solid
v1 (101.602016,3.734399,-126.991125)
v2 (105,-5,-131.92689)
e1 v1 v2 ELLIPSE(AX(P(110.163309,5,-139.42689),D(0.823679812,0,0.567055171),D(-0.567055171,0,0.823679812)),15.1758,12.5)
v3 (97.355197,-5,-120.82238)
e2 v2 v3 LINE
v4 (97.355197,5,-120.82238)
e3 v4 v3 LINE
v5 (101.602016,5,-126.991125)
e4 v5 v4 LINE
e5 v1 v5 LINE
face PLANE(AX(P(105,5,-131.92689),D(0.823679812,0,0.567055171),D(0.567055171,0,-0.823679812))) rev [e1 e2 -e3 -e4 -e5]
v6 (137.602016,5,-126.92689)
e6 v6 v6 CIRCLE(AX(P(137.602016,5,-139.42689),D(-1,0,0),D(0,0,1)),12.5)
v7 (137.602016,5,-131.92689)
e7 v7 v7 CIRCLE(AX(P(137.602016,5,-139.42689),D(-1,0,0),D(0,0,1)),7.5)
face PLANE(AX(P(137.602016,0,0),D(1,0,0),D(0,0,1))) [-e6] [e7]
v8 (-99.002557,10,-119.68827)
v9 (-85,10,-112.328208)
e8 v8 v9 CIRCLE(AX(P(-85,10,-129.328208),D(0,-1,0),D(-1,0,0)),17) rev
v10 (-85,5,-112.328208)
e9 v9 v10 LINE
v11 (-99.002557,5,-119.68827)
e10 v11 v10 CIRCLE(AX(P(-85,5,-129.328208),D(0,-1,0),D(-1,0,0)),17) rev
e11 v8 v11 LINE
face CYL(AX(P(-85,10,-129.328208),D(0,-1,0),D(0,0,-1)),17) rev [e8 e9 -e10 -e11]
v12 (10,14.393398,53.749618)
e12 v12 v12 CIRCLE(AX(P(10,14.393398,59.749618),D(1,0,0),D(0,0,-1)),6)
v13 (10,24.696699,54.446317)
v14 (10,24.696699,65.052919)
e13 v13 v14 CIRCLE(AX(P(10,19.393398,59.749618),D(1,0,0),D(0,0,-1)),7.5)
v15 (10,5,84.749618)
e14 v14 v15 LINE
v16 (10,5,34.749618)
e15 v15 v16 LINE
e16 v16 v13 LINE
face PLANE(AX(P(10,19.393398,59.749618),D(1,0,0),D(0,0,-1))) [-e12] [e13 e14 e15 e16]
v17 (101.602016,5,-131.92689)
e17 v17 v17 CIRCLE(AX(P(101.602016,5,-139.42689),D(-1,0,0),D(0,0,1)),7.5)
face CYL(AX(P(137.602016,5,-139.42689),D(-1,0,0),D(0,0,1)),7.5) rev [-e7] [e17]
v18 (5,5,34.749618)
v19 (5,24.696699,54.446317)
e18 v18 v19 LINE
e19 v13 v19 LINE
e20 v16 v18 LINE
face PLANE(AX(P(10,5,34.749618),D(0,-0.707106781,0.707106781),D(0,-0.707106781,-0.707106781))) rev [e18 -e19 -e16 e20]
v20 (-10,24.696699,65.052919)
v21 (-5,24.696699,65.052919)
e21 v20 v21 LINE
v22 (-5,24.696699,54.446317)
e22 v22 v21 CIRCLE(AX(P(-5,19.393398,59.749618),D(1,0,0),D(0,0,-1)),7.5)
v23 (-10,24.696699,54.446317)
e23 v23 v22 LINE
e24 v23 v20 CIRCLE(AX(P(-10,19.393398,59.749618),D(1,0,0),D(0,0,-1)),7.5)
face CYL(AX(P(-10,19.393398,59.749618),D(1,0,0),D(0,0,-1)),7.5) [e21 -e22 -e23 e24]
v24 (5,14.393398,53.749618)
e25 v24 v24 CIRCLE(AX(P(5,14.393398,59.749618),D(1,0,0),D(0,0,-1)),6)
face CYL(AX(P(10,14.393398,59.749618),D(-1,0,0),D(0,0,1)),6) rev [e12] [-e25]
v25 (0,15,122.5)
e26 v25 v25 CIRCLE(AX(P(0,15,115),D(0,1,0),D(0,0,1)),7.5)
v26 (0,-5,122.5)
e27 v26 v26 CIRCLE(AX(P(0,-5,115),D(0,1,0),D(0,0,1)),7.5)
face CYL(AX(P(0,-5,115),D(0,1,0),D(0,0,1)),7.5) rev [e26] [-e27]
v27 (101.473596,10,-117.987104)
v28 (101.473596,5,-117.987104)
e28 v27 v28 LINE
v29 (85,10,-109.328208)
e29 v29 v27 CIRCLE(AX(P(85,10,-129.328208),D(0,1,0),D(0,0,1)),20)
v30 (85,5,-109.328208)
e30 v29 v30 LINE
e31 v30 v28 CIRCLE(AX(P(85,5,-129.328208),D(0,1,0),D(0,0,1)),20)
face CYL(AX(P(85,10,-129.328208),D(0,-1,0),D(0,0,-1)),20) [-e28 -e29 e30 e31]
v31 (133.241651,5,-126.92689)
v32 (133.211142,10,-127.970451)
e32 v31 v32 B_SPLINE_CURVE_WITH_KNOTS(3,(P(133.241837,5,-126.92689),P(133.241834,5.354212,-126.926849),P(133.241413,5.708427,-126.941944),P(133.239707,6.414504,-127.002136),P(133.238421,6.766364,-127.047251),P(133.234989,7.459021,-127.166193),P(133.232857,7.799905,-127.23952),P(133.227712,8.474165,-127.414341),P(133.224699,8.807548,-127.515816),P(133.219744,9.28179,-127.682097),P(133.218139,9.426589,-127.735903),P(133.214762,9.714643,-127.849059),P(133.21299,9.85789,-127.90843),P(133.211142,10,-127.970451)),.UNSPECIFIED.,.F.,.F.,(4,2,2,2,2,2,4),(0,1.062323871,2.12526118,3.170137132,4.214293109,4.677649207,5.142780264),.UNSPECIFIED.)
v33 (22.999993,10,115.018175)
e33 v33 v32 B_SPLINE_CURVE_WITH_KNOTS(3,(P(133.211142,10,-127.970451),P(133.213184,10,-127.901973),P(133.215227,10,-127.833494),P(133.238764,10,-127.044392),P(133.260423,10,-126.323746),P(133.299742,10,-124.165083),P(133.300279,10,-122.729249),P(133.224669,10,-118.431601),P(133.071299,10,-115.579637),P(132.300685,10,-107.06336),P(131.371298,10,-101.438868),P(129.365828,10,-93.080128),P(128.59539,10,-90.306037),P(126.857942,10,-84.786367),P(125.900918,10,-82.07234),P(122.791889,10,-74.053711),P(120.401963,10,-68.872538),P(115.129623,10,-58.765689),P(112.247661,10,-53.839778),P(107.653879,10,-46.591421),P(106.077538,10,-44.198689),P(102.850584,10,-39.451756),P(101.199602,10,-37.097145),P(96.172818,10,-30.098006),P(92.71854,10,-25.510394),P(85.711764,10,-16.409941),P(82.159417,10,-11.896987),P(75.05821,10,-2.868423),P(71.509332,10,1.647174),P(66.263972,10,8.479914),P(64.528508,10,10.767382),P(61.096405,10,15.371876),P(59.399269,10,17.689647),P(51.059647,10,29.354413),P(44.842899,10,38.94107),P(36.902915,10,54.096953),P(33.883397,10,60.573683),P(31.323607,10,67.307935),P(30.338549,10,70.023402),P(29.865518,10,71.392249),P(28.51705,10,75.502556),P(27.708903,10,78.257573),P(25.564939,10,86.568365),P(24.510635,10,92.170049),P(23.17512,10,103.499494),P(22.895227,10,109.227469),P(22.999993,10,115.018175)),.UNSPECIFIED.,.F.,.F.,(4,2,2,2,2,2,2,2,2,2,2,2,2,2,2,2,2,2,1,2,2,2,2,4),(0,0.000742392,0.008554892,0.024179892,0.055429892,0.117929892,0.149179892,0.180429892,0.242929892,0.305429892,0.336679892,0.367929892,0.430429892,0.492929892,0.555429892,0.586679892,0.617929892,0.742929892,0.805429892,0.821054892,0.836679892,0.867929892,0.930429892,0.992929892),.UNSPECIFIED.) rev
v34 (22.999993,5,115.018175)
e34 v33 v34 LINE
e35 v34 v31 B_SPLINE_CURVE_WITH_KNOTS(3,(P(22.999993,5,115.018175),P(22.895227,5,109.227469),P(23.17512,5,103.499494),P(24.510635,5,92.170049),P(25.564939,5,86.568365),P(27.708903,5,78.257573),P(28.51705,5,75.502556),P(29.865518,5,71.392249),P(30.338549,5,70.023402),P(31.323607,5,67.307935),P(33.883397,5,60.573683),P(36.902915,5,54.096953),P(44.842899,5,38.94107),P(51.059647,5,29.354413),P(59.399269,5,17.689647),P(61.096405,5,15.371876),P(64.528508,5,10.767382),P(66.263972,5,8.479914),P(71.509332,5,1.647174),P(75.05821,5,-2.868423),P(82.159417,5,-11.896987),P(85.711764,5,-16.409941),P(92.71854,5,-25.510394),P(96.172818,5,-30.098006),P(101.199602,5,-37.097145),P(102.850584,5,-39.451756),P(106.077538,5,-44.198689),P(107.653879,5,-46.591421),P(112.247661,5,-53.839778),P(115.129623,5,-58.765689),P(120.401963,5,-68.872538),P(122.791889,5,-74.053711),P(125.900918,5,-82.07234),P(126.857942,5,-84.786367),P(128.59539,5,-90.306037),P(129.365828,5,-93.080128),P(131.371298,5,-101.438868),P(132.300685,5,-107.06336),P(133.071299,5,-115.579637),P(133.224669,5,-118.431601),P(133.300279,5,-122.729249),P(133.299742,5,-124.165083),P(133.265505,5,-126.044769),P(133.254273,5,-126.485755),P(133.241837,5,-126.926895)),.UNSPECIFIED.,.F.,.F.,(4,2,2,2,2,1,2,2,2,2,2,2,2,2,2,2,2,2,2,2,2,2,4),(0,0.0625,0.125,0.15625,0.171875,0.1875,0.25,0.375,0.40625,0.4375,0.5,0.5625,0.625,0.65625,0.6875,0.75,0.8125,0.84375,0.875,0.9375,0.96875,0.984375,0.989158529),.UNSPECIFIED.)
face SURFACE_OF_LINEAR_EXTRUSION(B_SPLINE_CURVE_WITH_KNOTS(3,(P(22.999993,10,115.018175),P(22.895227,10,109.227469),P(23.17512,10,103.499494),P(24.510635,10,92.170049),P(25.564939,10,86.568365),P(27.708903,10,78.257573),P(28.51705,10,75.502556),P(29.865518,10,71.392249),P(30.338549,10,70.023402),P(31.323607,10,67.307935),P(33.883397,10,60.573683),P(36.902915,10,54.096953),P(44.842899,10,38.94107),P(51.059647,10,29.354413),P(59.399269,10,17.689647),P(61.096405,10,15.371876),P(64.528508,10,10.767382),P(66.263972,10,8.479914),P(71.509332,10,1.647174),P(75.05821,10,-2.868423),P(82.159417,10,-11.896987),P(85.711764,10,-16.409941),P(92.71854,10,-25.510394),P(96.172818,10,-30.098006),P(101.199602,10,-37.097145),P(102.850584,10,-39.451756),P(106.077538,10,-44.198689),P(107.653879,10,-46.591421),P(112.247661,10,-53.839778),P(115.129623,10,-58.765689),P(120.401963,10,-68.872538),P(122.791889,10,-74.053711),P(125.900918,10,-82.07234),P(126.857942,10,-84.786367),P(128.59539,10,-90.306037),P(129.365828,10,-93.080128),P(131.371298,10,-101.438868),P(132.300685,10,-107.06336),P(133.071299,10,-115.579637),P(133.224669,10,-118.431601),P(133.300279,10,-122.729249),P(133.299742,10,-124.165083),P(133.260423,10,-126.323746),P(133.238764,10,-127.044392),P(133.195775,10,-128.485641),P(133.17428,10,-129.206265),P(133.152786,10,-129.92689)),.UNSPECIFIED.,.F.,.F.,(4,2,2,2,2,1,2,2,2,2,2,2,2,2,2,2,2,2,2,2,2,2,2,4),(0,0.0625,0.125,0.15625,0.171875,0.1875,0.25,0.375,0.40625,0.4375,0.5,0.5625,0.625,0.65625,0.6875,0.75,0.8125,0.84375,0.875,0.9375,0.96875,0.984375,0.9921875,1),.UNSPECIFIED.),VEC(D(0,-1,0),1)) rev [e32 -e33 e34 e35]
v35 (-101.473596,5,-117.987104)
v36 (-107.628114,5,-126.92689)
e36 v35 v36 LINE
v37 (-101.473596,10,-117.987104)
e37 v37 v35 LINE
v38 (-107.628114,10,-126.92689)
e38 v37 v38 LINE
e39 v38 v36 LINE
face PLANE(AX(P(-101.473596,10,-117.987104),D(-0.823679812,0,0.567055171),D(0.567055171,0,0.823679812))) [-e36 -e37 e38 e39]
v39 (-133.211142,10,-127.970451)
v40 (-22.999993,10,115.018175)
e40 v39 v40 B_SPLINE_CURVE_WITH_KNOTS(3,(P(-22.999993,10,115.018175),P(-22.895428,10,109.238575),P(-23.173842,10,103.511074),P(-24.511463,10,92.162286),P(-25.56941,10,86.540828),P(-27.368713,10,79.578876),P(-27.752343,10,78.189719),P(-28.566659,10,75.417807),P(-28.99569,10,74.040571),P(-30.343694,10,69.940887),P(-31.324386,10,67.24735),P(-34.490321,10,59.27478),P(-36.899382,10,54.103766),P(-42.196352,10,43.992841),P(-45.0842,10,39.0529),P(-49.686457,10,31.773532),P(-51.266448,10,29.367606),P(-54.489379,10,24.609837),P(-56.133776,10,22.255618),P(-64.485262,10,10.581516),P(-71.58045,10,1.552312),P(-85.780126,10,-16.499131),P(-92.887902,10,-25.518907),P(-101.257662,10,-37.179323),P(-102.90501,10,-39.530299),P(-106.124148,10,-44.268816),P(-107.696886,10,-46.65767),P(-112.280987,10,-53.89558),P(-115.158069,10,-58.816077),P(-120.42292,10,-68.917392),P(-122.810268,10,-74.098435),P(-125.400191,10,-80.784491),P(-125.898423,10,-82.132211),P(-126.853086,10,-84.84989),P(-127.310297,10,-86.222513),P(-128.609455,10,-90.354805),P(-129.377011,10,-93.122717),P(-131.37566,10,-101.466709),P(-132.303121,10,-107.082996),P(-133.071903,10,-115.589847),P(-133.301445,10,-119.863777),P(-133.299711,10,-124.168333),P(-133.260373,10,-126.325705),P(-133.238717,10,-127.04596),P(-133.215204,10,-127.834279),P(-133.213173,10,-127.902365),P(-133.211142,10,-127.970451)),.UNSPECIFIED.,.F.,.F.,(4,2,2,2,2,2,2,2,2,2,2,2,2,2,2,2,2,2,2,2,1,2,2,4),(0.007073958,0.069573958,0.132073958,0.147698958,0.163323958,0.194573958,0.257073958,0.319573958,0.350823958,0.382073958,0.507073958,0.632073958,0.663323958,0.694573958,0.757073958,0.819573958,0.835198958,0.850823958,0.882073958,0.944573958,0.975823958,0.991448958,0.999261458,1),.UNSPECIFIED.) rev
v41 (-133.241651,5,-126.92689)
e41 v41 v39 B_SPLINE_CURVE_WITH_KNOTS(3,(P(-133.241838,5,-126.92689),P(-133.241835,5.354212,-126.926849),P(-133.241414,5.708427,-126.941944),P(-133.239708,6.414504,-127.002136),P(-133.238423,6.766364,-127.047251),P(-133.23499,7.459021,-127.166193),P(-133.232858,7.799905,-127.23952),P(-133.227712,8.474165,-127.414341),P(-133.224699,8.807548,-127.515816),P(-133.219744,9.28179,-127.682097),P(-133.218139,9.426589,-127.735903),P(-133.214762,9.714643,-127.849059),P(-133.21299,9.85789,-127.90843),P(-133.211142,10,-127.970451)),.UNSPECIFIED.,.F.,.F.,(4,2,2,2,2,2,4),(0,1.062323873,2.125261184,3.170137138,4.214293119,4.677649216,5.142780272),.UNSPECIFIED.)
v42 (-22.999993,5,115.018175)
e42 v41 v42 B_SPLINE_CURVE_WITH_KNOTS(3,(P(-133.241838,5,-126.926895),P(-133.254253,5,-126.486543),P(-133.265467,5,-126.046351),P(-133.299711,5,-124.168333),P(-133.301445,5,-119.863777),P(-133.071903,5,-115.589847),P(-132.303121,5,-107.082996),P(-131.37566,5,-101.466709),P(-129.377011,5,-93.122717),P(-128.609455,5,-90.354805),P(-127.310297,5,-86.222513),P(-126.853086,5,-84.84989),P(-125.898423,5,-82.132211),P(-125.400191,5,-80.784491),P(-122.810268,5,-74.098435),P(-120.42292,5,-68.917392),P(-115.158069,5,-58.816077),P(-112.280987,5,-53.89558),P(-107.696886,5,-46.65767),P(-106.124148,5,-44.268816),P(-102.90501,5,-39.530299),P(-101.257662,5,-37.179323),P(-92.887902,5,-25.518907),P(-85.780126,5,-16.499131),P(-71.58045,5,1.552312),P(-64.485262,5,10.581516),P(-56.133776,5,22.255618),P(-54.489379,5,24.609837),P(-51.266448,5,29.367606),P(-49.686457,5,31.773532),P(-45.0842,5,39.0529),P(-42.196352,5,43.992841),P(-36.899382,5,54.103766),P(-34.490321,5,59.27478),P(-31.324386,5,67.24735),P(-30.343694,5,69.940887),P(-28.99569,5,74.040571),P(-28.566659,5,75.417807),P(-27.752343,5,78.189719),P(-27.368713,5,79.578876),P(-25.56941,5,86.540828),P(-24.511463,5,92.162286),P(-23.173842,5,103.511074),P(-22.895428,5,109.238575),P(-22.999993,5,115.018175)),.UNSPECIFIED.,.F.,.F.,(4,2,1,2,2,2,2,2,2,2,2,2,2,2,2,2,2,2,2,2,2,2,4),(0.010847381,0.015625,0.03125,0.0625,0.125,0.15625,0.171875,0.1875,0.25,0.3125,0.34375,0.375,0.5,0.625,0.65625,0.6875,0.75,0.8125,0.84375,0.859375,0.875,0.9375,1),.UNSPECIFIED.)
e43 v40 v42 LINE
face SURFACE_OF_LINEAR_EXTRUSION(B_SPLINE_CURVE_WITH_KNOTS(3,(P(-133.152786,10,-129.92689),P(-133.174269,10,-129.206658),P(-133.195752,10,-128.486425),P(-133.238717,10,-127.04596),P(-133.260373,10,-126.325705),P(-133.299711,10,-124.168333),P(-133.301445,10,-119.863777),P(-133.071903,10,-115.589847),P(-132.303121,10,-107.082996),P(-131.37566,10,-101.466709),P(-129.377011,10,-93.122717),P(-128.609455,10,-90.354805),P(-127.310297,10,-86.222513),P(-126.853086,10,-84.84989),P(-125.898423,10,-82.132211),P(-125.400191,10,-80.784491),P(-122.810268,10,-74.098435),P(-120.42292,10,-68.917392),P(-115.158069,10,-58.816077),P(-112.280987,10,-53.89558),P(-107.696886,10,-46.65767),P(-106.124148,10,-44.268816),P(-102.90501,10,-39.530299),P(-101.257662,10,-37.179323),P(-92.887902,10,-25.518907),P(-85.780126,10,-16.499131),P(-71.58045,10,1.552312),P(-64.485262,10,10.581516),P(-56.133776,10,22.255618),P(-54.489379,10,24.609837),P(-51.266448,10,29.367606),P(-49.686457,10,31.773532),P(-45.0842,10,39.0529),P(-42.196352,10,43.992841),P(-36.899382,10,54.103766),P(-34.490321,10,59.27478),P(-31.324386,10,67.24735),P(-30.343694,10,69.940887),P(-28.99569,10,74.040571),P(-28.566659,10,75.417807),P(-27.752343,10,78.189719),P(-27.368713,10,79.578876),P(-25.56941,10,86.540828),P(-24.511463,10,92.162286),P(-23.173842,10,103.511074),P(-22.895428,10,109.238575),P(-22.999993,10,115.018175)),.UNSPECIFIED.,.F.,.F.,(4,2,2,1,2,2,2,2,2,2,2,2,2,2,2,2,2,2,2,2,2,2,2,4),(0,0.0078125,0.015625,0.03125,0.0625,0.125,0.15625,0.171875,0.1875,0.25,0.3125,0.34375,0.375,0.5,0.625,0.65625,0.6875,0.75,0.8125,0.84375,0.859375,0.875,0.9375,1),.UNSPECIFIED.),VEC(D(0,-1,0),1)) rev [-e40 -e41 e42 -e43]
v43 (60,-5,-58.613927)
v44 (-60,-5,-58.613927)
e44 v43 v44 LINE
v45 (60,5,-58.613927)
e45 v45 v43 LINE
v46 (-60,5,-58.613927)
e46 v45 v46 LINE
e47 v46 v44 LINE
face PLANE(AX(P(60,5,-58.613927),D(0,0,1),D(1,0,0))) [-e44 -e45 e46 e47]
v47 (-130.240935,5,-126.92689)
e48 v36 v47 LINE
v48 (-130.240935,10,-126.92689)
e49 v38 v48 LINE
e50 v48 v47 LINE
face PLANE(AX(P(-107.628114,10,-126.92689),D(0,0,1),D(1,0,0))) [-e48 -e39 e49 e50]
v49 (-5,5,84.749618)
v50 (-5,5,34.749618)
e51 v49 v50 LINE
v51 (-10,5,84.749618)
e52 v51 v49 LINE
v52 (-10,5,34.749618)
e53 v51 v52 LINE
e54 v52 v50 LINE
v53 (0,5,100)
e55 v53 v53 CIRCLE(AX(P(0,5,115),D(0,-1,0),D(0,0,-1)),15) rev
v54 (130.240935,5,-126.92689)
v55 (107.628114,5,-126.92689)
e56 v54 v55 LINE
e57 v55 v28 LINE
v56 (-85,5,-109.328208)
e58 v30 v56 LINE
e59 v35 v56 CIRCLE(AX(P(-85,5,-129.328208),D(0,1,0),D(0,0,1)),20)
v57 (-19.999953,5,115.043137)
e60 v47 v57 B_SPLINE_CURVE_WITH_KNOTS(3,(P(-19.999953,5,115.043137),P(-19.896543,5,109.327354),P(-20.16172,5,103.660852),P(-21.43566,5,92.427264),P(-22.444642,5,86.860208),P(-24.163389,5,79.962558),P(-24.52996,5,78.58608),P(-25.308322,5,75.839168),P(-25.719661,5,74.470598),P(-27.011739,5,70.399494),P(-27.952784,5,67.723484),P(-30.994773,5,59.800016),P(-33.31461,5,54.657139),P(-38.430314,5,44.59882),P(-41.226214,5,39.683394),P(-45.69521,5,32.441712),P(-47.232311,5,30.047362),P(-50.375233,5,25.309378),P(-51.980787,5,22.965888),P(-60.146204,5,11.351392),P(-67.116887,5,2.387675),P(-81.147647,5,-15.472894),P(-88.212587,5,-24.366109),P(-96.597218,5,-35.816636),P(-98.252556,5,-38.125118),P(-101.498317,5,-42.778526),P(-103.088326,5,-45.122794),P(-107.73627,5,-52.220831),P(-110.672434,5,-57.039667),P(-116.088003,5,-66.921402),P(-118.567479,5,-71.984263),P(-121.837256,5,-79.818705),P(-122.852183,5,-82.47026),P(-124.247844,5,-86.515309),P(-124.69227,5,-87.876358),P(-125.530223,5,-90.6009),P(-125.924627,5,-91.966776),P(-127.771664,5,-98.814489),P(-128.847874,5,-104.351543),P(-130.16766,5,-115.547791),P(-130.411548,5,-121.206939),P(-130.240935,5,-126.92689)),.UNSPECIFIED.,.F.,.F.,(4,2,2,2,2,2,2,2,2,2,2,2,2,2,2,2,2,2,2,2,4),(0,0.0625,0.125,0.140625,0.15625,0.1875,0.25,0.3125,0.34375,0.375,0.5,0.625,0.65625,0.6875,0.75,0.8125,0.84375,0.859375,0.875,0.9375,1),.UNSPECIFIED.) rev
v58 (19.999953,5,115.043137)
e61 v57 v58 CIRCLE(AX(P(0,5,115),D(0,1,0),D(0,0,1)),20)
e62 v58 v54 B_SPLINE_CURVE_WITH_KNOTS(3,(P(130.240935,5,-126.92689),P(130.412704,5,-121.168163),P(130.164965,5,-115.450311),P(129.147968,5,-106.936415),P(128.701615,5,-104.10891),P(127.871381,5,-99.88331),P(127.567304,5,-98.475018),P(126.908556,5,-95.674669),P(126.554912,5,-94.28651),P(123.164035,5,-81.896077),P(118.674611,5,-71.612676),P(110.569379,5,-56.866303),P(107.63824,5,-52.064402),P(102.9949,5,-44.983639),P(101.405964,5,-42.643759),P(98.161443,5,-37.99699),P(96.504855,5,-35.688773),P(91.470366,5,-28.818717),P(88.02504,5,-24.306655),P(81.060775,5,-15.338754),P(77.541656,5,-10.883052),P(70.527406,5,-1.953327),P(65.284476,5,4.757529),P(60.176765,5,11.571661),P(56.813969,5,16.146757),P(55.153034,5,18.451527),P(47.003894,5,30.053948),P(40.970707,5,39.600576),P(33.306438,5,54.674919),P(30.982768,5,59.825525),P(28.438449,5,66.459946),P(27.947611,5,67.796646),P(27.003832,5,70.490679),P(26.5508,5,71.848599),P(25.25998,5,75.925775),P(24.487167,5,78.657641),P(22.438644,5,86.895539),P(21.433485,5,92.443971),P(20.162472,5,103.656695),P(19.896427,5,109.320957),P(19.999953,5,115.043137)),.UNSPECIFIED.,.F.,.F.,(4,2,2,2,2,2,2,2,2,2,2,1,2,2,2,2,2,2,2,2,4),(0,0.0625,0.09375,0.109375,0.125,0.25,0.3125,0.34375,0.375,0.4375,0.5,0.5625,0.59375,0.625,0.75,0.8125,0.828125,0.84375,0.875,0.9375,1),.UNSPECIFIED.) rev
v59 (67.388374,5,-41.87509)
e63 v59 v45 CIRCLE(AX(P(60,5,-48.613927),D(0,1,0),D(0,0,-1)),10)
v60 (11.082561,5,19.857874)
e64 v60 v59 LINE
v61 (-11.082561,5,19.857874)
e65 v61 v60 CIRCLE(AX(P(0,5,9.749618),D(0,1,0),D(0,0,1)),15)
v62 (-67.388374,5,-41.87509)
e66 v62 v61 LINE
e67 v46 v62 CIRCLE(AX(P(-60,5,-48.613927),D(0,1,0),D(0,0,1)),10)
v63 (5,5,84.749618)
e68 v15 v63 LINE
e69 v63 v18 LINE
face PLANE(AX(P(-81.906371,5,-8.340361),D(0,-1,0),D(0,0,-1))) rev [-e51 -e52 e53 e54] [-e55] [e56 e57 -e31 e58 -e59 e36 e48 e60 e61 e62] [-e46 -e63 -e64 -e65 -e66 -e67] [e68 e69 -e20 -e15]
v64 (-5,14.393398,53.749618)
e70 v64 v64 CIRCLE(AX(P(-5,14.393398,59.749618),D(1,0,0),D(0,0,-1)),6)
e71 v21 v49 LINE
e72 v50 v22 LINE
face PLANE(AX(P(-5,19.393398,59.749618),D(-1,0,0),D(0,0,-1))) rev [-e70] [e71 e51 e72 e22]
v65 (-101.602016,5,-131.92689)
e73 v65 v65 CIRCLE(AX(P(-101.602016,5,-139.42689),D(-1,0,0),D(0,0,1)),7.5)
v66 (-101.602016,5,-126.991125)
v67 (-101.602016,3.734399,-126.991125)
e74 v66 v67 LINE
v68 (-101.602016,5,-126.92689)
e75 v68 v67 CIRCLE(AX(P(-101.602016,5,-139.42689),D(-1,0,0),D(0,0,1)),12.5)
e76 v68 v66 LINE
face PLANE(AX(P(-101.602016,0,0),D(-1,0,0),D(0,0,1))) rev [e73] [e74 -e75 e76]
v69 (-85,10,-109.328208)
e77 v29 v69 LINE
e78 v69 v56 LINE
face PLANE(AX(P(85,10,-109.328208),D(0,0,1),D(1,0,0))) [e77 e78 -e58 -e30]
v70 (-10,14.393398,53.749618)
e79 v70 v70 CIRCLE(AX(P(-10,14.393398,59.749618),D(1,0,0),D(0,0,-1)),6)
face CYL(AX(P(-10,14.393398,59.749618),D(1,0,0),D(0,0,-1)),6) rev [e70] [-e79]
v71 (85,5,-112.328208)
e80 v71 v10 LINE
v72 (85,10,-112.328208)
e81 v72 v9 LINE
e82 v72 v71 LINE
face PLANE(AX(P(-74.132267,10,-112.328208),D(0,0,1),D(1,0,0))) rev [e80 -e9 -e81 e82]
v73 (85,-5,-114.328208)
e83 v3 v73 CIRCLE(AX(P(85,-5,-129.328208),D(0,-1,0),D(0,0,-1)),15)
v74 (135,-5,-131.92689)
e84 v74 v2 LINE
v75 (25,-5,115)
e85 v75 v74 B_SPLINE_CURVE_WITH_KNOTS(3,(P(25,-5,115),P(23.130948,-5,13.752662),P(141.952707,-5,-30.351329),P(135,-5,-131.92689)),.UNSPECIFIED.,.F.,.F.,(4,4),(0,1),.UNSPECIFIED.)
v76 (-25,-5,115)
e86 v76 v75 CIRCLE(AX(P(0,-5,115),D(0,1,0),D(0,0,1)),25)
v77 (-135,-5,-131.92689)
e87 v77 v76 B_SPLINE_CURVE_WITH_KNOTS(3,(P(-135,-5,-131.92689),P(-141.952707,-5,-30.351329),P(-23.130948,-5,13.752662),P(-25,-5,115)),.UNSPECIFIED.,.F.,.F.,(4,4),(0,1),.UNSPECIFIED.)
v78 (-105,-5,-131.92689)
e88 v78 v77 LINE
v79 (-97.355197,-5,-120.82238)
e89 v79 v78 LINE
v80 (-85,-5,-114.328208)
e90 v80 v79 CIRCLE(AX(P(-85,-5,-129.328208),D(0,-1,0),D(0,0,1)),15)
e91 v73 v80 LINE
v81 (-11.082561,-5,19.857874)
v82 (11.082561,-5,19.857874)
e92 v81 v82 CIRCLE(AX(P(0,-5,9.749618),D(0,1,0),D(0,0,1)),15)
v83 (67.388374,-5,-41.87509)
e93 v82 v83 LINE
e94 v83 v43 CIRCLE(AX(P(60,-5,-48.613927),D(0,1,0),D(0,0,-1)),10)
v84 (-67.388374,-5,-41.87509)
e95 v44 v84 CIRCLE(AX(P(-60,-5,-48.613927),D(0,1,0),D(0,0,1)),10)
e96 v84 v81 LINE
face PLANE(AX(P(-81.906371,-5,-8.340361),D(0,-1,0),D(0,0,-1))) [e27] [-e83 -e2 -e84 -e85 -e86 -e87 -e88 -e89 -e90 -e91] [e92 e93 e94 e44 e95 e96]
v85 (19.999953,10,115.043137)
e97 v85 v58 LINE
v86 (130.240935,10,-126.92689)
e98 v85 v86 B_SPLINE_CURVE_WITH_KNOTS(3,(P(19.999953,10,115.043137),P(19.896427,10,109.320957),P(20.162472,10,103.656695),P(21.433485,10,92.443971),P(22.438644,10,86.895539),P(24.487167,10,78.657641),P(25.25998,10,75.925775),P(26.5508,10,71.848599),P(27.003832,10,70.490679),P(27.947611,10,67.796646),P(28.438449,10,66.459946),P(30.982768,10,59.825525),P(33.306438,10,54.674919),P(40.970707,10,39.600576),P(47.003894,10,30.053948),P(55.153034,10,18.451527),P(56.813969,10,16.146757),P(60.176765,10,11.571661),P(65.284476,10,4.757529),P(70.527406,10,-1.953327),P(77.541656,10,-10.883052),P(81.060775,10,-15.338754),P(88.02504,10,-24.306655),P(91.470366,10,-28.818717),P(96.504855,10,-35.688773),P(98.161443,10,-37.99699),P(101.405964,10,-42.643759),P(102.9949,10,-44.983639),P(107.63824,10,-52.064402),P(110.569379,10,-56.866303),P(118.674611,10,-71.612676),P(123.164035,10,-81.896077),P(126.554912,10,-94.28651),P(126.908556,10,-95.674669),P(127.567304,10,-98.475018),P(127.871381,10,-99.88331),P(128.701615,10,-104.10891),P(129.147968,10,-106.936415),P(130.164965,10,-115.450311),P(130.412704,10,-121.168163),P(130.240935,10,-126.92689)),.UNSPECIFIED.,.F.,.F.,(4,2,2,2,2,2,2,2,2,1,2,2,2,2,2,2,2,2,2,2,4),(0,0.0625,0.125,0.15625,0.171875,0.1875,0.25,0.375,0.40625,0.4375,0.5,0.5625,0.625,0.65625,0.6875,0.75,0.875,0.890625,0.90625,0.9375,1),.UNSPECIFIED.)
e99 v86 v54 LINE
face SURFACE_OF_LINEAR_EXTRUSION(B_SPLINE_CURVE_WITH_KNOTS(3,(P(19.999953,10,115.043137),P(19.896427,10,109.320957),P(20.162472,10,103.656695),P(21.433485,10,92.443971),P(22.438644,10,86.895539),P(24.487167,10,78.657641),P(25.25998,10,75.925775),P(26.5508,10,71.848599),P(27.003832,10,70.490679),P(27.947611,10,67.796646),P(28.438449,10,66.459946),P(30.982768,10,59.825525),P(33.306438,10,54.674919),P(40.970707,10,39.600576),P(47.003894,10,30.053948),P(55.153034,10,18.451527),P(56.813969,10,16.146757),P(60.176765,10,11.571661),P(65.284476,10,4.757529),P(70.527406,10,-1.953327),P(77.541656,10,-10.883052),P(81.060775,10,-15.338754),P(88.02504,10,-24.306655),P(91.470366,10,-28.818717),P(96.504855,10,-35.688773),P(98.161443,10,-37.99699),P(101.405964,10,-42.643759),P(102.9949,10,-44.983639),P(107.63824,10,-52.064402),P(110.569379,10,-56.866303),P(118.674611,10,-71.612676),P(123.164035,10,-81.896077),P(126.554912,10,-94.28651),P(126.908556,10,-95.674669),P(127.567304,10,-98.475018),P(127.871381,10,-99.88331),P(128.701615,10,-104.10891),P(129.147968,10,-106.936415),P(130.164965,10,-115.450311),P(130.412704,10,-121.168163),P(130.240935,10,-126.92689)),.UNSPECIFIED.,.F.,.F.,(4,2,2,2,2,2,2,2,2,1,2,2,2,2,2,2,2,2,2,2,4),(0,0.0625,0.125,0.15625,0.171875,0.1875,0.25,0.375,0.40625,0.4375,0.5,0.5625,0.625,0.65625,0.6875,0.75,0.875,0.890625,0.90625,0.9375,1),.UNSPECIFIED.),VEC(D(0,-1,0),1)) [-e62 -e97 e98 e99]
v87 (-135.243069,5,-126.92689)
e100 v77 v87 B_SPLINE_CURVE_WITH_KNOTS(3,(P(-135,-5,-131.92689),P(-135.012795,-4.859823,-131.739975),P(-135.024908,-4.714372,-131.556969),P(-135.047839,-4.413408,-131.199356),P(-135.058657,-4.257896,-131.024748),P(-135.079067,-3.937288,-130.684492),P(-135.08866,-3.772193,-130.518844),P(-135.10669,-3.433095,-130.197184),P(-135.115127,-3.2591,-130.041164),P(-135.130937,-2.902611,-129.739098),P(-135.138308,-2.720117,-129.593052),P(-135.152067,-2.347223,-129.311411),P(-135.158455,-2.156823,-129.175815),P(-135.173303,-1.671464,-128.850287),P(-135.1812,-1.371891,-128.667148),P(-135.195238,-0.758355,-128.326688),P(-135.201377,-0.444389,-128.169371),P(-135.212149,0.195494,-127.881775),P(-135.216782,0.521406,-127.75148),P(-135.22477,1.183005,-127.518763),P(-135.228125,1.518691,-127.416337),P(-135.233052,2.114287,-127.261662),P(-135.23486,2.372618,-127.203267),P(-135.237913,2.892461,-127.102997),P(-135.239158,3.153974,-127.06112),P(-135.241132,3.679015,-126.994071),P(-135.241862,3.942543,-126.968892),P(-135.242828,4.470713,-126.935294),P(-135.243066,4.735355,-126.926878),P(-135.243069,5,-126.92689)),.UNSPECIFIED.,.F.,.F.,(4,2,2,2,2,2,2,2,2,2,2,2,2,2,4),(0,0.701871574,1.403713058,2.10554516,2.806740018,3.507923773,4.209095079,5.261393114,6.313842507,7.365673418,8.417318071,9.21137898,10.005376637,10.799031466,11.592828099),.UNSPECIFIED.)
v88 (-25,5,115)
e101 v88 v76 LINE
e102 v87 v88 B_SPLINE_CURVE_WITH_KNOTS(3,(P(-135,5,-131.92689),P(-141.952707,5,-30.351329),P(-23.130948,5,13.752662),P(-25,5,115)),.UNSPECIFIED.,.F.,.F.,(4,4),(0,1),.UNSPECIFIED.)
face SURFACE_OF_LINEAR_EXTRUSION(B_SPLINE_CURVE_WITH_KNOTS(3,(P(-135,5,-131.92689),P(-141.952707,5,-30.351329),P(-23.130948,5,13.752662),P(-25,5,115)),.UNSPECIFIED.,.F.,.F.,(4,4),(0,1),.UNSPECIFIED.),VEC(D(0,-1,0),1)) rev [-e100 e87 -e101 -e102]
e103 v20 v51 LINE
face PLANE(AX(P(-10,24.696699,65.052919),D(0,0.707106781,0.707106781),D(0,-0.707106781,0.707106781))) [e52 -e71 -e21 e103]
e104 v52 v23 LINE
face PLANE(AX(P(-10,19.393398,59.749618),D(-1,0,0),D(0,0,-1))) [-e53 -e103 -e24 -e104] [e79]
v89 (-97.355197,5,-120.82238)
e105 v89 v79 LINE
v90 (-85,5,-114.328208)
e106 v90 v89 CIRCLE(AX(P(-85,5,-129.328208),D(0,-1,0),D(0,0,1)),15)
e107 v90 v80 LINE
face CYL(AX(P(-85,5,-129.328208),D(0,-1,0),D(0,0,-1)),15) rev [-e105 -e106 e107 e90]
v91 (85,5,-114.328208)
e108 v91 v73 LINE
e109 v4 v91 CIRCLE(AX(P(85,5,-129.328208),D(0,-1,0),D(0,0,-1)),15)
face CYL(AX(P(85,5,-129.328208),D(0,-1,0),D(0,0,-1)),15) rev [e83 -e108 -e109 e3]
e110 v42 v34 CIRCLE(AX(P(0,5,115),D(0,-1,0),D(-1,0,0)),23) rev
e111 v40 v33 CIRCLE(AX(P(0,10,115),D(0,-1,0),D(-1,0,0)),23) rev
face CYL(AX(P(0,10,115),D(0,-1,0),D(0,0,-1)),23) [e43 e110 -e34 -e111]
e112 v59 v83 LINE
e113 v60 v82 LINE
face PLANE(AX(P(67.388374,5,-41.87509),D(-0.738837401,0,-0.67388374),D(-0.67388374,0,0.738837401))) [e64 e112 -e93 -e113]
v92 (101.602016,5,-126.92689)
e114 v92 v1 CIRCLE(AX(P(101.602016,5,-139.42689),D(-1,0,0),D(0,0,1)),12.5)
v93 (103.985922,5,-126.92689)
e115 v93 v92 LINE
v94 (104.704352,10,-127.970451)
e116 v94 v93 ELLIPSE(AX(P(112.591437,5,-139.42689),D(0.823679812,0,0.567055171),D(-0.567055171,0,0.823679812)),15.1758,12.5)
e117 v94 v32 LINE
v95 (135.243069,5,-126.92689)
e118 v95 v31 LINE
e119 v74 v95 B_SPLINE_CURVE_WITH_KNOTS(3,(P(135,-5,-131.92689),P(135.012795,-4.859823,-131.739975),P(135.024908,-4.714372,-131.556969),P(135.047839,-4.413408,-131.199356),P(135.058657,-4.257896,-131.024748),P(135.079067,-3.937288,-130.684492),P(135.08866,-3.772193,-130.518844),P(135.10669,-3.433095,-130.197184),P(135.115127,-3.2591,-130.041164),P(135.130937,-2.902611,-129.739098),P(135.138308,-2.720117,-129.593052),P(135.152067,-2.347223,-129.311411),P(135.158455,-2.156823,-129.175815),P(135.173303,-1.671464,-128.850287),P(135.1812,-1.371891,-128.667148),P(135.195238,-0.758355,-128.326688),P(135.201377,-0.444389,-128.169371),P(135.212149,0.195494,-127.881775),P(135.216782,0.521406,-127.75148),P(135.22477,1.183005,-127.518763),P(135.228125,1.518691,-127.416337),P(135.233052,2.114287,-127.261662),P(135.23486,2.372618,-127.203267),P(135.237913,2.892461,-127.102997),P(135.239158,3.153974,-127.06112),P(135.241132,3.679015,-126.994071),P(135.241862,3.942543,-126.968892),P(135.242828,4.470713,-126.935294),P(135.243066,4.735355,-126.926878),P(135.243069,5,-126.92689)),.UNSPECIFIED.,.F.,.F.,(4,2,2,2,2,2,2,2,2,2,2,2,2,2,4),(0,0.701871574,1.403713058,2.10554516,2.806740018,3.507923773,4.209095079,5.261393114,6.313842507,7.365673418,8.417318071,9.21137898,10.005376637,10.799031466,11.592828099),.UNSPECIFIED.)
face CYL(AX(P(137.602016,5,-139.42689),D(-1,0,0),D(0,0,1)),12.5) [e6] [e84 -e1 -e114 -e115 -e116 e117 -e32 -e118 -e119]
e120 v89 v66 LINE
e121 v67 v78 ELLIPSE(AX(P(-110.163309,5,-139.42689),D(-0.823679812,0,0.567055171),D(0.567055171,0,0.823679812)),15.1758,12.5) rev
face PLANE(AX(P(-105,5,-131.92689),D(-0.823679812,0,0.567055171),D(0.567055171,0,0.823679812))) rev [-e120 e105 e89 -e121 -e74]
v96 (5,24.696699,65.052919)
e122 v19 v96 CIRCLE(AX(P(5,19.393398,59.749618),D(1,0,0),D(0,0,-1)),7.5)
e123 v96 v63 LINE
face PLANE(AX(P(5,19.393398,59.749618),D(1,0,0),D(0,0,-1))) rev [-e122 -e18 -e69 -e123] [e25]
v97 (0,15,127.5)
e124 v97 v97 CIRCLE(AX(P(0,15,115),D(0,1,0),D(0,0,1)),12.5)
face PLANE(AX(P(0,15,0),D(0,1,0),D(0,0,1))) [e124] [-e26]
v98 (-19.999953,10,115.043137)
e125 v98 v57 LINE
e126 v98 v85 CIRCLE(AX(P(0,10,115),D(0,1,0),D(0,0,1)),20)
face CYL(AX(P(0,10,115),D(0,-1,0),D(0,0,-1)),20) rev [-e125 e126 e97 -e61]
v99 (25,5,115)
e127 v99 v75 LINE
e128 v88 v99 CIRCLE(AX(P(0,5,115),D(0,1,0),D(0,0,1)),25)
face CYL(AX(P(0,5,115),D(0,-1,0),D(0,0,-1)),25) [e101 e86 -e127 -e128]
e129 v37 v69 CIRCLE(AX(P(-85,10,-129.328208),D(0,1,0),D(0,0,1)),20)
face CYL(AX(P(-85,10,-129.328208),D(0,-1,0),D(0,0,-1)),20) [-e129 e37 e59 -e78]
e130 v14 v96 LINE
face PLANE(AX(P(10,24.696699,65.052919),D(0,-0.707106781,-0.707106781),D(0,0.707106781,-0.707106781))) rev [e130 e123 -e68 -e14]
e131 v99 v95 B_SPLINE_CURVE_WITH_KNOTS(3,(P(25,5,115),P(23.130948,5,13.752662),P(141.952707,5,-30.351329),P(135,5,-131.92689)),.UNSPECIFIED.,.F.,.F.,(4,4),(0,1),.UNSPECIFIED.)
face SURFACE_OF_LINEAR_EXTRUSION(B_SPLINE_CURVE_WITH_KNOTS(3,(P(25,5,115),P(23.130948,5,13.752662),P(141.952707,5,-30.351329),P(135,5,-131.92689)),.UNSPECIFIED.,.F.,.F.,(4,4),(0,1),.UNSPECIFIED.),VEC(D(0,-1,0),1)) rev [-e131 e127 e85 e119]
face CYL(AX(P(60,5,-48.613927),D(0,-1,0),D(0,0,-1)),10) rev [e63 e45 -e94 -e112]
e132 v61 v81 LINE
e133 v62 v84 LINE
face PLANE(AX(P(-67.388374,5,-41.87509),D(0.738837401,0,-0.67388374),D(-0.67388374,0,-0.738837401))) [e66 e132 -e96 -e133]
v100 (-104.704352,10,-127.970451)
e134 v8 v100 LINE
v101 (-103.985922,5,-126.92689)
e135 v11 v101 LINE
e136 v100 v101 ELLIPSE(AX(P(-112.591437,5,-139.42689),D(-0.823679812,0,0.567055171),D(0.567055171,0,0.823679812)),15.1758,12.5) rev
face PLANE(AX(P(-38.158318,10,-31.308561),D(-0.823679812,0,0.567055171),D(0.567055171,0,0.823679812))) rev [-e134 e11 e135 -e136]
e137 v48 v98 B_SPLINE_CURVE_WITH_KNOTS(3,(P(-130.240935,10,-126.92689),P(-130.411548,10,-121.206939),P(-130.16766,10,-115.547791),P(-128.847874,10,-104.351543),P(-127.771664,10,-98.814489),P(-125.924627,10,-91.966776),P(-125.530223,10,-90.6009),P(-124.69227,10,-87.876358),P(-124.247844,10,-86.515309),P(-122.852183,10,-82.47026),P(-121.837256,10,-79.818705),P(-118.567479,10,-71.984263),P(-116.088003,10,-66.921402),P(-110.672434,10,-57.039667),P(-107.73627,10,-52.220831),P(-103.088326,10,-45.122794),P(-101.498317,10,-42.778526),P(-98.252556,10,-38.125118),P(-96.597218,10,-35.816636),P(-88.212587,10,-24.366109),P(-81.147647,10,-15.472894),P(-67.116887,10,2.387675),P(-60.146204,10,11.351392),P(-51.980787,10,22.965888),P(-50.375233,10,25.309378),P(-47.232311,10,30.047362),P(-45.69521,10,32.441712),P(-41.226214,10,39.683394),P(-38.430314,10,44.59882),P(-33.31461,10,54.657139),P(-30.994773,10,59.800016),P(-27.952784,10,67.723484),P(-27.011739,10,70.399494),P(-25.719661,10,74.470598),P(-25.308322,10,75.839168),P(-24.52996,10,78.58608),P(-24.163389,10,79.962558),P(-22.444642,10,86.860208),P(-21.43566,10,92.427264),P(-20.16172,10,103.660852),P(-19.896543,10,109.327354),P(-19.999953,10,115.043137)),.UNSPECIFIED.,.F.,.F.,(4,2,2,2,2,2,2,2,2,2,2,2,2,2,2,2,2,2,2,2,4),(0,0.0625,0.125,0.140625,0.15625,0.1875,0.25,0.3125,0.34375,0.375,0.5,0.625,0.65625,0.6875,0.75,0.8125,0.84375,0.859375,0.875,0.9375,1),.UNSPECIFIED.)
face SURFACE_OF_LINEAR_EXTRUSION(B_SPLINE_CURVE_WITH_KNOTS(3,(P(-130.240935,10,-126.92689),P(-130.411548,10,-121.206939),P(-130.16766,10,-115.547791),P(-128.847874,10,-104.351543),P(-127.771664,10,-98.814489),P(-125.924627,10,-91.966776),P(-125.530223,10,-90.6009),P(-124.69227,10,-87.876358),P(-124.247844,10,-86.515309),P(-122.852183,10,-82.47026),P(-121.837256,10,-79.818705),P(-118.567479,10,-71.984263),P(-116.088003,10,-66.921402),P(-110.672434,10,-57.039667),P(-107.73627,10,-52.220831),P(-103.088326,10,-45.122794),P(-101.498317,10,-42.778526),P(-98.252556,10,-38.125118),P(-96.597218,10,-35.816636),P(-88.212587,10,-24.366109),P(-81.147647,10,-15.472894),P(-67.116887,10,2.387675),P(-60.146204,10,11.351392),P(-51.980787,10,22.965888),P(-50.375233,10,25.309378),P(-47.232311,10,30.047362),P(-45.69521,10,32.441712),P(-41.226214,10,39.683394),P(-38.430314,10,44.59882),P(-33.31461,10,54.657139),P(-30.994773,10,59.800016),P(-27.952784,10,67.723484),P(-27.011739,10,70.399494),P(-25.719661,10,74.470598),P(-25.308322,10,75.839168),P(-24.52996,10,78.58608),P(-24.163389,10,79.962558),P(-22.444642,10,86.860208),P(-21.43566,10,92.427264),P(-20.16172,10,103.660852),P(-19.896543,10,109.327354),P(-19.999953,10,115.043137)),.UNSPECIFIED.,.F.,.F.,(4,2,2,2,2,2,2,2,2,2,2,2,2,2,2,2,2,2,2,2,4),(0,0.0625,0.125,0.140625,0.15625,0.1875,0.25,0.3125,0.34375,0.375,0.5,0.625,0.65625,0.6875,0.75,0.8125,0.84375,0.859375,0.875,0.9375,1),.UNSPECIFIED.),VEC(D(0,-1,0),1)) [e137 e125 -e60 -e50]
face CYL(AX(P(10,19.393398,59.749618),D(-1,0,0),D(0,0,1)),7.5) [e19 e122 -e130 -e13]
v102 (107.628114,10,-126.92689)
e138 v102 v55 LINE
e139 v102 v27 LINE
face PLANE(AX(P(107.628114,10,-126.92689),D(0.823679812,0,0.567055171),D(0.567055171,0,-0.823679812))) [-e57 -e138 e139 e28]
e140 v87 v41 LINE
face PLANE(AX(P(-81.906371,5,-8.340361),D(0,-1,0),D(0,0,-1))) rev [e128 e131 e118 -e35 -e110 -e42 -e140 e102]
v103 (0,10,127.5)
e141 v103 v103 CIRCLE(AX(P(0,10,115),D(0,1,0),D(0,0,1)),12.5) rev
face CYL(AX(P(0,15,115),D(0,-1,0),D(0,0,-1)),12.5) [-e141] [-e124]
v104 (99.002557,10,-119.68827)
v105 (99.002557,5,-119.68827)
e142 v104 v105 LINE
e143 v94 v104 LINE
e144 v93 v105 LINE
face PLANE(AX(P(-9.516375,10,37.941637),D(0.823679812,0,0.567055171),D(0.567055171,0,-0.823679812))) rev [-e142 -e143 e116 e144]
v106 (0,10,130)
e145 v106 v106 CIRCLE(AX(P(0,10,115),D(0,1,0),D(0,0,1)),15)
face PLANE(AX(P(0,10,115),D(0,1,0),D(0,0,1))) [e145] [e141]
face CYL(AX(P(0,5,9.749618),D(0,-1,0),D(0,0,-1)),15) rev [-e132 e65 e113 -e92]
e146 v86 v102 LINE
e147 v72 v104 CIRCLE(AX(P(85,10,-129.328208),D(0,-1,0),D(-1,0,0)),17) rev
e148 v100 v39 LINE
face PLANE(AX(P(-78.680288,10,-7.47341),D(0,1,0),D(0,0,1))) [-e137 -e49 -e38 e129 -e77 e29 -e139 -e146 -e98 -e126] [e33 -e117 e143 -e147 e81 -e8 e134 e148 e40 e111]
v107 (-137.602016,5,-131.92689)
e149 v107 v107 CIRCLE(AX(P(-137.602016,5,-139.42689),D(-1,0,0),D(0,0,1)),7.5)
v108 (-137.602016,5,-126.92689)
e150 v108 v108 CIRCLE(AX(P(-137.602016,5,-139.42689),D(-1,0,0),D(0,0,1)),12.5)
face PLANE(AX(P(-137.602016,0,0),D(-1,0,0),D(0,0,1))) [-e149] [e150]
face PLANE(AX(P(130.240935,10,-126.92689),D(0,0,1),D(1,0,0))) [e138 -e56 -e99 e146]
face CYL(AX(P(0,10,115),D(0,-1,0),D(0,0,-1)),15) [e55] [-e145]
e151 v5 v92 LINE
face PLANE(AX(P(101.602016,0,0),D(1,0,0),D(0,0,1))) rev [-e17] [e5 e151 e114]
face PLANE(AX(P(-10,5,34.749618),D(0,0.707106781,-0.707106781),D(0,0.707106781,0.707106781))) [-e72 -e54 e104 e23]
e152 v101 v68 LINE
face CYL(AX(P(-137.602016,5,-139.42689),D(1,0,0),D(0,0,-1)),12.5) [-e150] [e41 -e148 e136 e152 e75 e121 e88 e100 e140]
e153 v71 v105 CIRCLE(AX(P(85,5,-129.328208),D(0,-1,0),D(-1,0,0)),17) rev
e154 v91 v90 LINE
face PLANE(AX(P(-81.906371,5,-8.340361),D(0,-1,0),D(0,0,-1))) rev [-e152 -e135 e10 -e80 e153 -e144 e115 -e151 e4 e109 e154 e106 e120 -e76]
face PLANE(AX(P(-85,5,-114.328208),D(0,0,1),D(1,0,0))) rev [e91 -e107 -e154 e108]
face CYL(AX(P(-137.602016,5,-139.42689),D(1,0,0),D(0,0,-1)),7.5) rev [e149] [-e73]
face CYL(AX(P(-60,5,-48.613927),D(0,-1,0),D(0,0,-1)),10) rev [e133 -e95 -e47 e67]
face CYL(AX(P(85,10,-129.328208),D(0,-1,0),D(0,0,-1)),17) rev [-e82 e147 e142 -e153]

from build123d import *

# Parameters (mm, degrees)
SALIENTE_EXTRUIR1_DEPTH = 5
CROQUIS6_R              = 6
SALIENTE_EXTRUIR2_DEPTH = 5
EXTRUIR_L_MINA1_DEPTH   = 5
CROQUIS9_R              = 12.5
CROQUIS9_R_2            = 7.5
SALIENTE_EXTRUIR3_DEPTH = 18
CROQUIS10_R             = 15
SALIENTE_EXTRUIR4_DEPTH = 5
CROQUIS10_3_R           = 12.5
SALIENTE_EXTRUIR5_DEPTH = 10
CROQUIS11_R             = 7.5
CORTAR_EXTRUIR1_DEPTH   = 20


# Read off the part's stored shape, not the designer's step: Extruir-Lámina1
with BuildPart() as part:
    # Croquis1 → Saliente-Extruir1 (new, symmetric)
    with BuildSketch(Plane(origin=(0, 0, 0), x_dir=(1, 0, 0), z_dir=(0, 1, 0))):
        with BuildLine():
            Line((-135, 131.926889983), (-105, 131.926889983))
            Line((-105, 131.926889983), (-97.355197186, 120.822380101))
            ThreePointArc((-97.355197186, 120.822380101), (-91.978989417, 116.050643627), (-85, 114.328207662))
            Line((-85, 114.328207662), (85, 114.328207662))
            ThreePointArc((85, 114.328207662), (91.978989417, 116.050643627), (97.355197186, 120.822380101))
            Line((97.355197186, 120.822380101), (105, 131.926889983))
            Line((105, 131.926889983), (135, 131.926889983))
            add(Edge.make_bspline(
                [(135, 131.926889983), (141.952707227, 30.351328575), (23.130947771, -13.752661754), (25, -115)],
                knots=[0, 0, 0, 0, 1, 1, 1, 1], degree=3))
            ThreePointArc((25, -115), (0, -140), (-25, -115))
            add(Edge.make_bspline(
                [(-135, 131.926889983), (-141.952707227, 30.351328575), (-23.130947771, -13.752661754), (-25, -115)],
                knots=[0, 0, 0, 0, 1, 1, 1, 1], degree=3))
        make_face()
        with BuildLine():
            Line((-67.388374008, 41.875089785), (-11.082561012, -19.857874005))
            ThreePointArc((-11.082561012, -19.857874005), (0, -24.749617904), (11.082561012, -19.857874005))
            Line((11.082561012, -19.857874005), (67.388374008, 41.875089785))
            ThreePointArc((67.388374008, 41.875089785), (69.148452711, 52.651972876), (60, 58.613927185))
            Line((60, 58.613927185), (-60, 58.613927185))
            ThreePointArc((-60, 58.613927185), (-69.148452711, 52.651972876), (-67.388374008, 41.875089785))
        make_face(mode=Mode.SUBTRACT)
    extrude(amount=SALIENTE_EXTRUIR1_DEPTH, both=True)

    # Croquis6 → Saliente-Extruir2 (add)
    with BuildSketch(Plane(origin=(5, 0, 0), x_dir=(0, 0, -1), z_dir=(1, 0, 0))):
        with BuildLine():
            Line((-34.749617904, 5), (-54.446317045, 24.696699141))
            ThreePointArc((-54.446317045, 24.696699141), (-59.749617904, 26.893398282), (-65.052918763, 24.696699141))
            Line((-65.052918763, 24.696699141), (-84.749617904, 5))
            Line((-84.749617904, 5), (-34.749617904, 5))
        make_face()
        with Locations((-59.749617904, 14.393398282)):
            Circle(CROQUIS6_R, mode=Mode.SUBTRACT)
    saliente_extruir2 = extrude(amount=SALIENTE_EXTRUIR2_DEPTH)

    # Simetría1: Saliente-Extruir2 across plane
    add(saliente_extruir2.mirror(Plane(origin=(0, 0, 0), x_dir=(0, 0, 1), z_dir=(1, 0, 0))))

    # Extruir-Lámina1 outline → Extruir-Lámina1 (add)
    with BuildSketch(Plane(origin=(0, 5, 0), x_dir=(1, 0, 0), z_dir=(0, 1, 0))):
        with BuildLine():
            Line((-106.051245454, 129.926889983), (-133.152785768, 129.926889983))
            add(Edge.make_bspline(
                [(-133.152785768, 129.926889983), (-133.174268661, 129.206657548), (-133.195751554, 128.486425113), (-133.238717339, 127.045960243), (-133.260373261, 126.325704896), (-133.29971078, 124.168332797), (-133.301445055, 119.863777053), (-133.071902544, 115.589846855), (-132.303121335, 107.08299626), (-131.375659828, 101.466708751), (-129.377010697, 93.122716596), (-128.609455105, 90.354805161), (-127.310297322, 86.222512835), (-126.853085806, 84.849889782), (-125.898422992, 82.13221094), (-125.400190812, 80.784491049), (-122.810267538, 74.098434679), (-120.42291954, 68.917392178), (-115.158069426, 58.816076633), (-112.280987066, 53.895580273), (-107.696886081, 46.657669825), (-106.124147998, 44.268816441), (-102.905009703, 39.53029905), (-101.257661562, 37.179322504), (-92.887901697, 25.518907347), (-85.780126078, 16.499131041), (-71.58045013, -1.552311855), (-64.485262059, -10.58151599), (-56.133776454, -22.255618212), (-54.489378689, -24.60983677), (-51.266448327, -29.367605618), (-49.686457, -31.773531765), (-45.084200101, -39.052900232), (-42.196352007, -43.992840655), (-36.899381702, -54.103765632), (-34.490320683, -59.274779718), (-31.324385536, -67.247350119), (-30.343694104, -69.940887052), (-28.995690401, -74.040571223), (-28.566659059, -75.417806864), (-27.752342999, -78.1897194), (-27.36871345, -79.578876355), (-25.569409892, -86.540828042), (-24.511463015, -92.162286021), (-23.173842405, -103.511074009), (-22.89542751, -109.238575264), (-22.999992819, -115.018175056)],
                knots=[0, 0, 0, 0, 0.0078125, 0.0078125, 0.015625, 0.015625, 0.03125, 0.0625, 0.0625, 0.125, 0.125, 0.15625, 0.15625, 0.171875, 0.171875, 0.1875, 0.1875, 0.25, 0.25, 0.3125, 0.3125, 0.34375, 0.34375, 0.375, 0.375, 0.5, 0.5, 0.625, 0.625, 0.65625, 0.65625, 0.6875, 0.6875, 0.75, 0.75, 0.8125, 0.8125, 0.84375, 0.84375, 0.859375, 0.859375, 0.875, 0.875, 0.9375, 0.9375, 1, 1, 1, 1], degree=3))
            ThreePointArc((-22.999992819, -115.018175056), (0, -138), (22.999992819, -115.018175056))
            add(Edge.make_bspline(
                [(22.999992819, -115.018175056), (22.895226578, -109.227469196), (23.175119897, -103.499493799), (24.510635399, -92.170049231), (25.564939035, -86.568365032), (27.708902858, -78.257572863), (28.51704955, -75.502555539), (29.865517568, -71.392248939), (30.338548889, -70.023401781), (31.323606713, -67.307934522), (33.883396821, -60.573683364), (36.902914511, -54.096952925), (44.842899172, -38.941069981), (51.05964732, -29.354413219), (59.399269025, -17.689647357), (61.096404781, -15.371876329), (64.528507919, -10.767382329), (66.263972325, -8.479913942), (71.509332424, -1.647173505), (75.058209766, 2.868422579), (82.159416645, 11.896986658), (85.711763576, 16.409941411), (92.71853999, 25.510393556), (96.172818384, 30.098005967), (101.199601756, 37.097144589), (102.850583686, 39.451755912), (106.077537799, 44.198688655), (107.653878795, 46.591420768), (112.247661329, 53.839778233), (115.129622576, 58.765689131), (120.401963318, 68.872537636), (122.791888775, 74.053710792), (125.900918311, 82.072340278), (126.85794185, 84.78636685), (128.595390264, 90.306037259), (129.365828105, 93.080127996), (131.371298301, 101.438867894), (132.300684578, 107.06336018), (133.071299421, 115.579637461), (133.224668995, 118.431600887), (133.300279497, 122.729249291), (133.29974204, 124.165082676), (133.260423161, 126.323746033), (133.238764128, 127.044391606), (133.195774948, 128.485640795), (133.174280358, 129.206265389), (133.152785768, 129.926889983)],
                knots=[0, 0, 0, 0, 0.0625, 0.0625, 0.125, 0.125, 0.15625, 0.15625, 0.171875, 0.171875, 0.1875, 0.25, 0.25, 0.375, 0.375, 0.40625, 0.40625, 0.4375, 0.4375, 0.5, 0.5, 0.5625, 0.5625, 0.625, 0.625, 0.65625, 0.65625, 0.6875, 0.6875, 0.75, 0.75, 0.8125, 0.8125, 0.84375, 0.84375, 0.875, 0.875, 0.9375, 0.9375, 0.96875, 0.96875, 0.984375, 0.984375, 0.9921875, 0.9921875, 1, 1, 1, 1], degree=3))
            Line((133.152785768, 129.926889983), (106.051245454, 129.926889983))
            Line((106.051245454, 129.926889983), (99.00255681, 119.688269759))
            ThreePointArc((99.00255681, 119.688269759), (92.90952134, 114.280301755), (85, 112.328207662))
            Line((85, 112.328207662), (-85, 112.328207662))
            ThreePointArc((-85, 112.328207662), (-92.90952134, 114.280301755), (-99.00255681, 119.688269759))
            Line((-99.00255681, 119.688269759), (-106.051245454, 129.926889983))
        make_face()
        with BuildLine():
            add(Edge.make_bspline(
                [(-130.240934691, 126.926889983), (-130.411547803, 121.206938866), (-130.167660454, 115.547790898), (-128.847873599, 104.35154298), (-127.771663621, 98.814488573), (-125.924626652, 91.966775959), (-125.530222733, 90.600900181), (-124.692269656, 87.876357749), (-124.247843704, 86.515308788), (-122.852183388, 82.470259757), (-121.837255643, 79.818705121), (-118.567479133, 71.984263185), (-116.088003331, 66.921402163), (-110.672433719, 57.039667488), (-107.736270132, 52.220831119), (-103.088325832, 45.122793633), (-101.498316815, 42.778525535), (-98.252555912, 38.12511811), (-96.597218478, 35.816635505), (-88.212586529, 24.366109238), (-81.147647458, 15.472894286), (-67.116887318, -2.387674605), (-60.14620433, -11.351391892), (-51.980786937, -22.965887821), (-50.3752326, -25.30937845), (-47.232310585, -30.047362451), (-45.695210028, -32.441712267), (-41.22621426, -39.683394316), (-38.430313516, -44.598820237), (-33.314610216, -54.657139194), (-30.994773138, -59.800015737), (-27.952783748, -67.72348367), (-27.011738958, -70.399494027), (-25.719660825, -74.470598268), (-25.308321792, -75.839168342), (-24.529959844, -78.586079762), (-24.163389081, -79.962558454), (-22.44464198, -86.860207974), (-21.435659553, -92.427263793), (-20.161720093, -103.660851552), (-19.89654276, -109.327354037), (-19.999953481, -115.043136709)],
                knots=[0, 0, 0, 0, 0.0625, 0.0625, 0.125, 0.125, 0.140625, 0.140625, 0.15625, 0.15625, 0.1875, 0.1875, 0.25, 0.25, 0.3125, 0.3125, 0.34375, 0.34375, 0.375, 0.375, 0.5, 0.5, 0.625, 0.625, 0.65625, 0.65625, 0.6875, 0.6875, 0.75, 0.75, 0.8125, 0.8125, 0.84375, 0.84375, 0.859375, 0.859375, 0.875, 0.875, 0.9375, 0.9375, 1, 1, 1, 1], degree=3))
            Line((-130.240934691, 126.926889983), (-107.628113635, 126.926889983))
            Line((-107.628113635, 126.926889983), (-101.473596247, 117.987104247))
            ThreePointArc((-101.473596247, 117.987104247), (-94.305319223, 111.624788948), (-85, 109.328207662))
            Line((-85, 109.328207662), (85, 109.328207662))
            ThreePointArc((85, 109.328207662), (94.305319223, 111.624788948), (101.473596247, 117.987104247))
            Line((101.473596247, 117.987104247), (107.628113635, 126.926889983))
            Line((107.628113635, 126.926889983), (130.240934691, 126.926889983))
            add(Edge.make_bspline(
                [(19.999953481, -115.043136709), (19.896427023, -109.32095693), (20.162471748, -103.656694634), (21.433484981, -92.443970754), (22.438644162, -86.895539052), (24.487167219, -78.657640706), (25.259980416, -75.925774614), (26.550800135, -71.848599206), (27.003831738, -70.490678553), (27.947611297, -67.796645784), (28.438448915, -66.459946369), (30.982768295, -59.825525168), (33.30643755, -54.67491864), (40.970707434, -39.600575574), (47.003894339, -30.053947563), (55.153034009, -18.451527139), (56.813969399, -16.146756985), (60.17676541, -11.571661263), (65.284475951, -4.757529312), (70.527406248, 1.95332666), (77.541655616, 10.883052022), (81.060774666, 15.338753839), (88.025039956, 24.30665524), (91.470366291, 28.818717273), (96.504855219, 35.688773254), (98.16144298, 37.996989622), (101.405963711, 42.643758601), (102.99490041, 44.983639174), (107.638239543, 52.064402242), (110.569379356, 56.866302948), (118.67461083, 71.612676057), (123.164034637, 81.896076903), (126.554911876, 94.28650979), (126.908556251, 95.67466944), (127.567304158, 98.475017725), (127.87138094, 99.883309895), (128.701614509, 104.108909856), (129.147967615, 106.936415177), (130.164965006, 115.450310911), (130.412704392, 121.16816323), (130.240934691, 126.926889983)],
                knots=[0, 0, 0, 0, 0.0625, 0.0625, 0.125, 0.125, 0.15625, 0.15625, 0.171875, 0.171875, 0.1875, 0.1875, 0.25, 0.25, 0.375, 0.375, 0.40625, 0.40625, 0.4375, 0.5, 0.5, 0.5625, 0.5625, 0.625, 0.625, 0.65625, 0.65625, 0.6875, 0.6875, 0.75, 0.75, 0.875, 0.875, 0.890625, 0.890625, 0.90625, 0.90625, 0.9375, 0.9375, 1, 1, 1, 1], degree=3))
            ThreePointArc((19.999953481, -115.043136709), (0, -135), (-19.999953481, -115.043136709))
        make_face(mode=Mode.SUBTRACT)
    extrude(amount=EXTRUIR_L_MINA1_DEPTH)

    # Croquis9 → Saliente-Extruir3 (add, symmetric)
    with BuildSketch(Plane(origin=(-119.602015611, 10, -129.926889983), x_dir=(0, 0, 1), z_dir=(-1, 0, 0))):
        with Locations((-9.5, -5)):
            Circle(CROQUIS9_R)
        with Locations((-9.5, -5)):
            Circle(CROQUIS9_R_2, mode=Mode.SUBTRACT)
    saliente_extruir3 = extrude(amount=SALIENTE_EXTRUIR3_DEPTH, both=True)

    # Simetría2: Saliente-Extruir3 across plane
    add(saliente_extruir3.mirror(Plane(origin=(0, 0, 0), x_dir=(0, 0, 1), z_dir=(1, 0, 0))))

    # Croquis10 → Saliente-Extruir4 (add)
    with BuildSketch(Plane(origin=(0, 5, 0), x_dir=(1, 0, 0), z_dir=(0, 1, 0))):
        with Locations(Location((0, -115, 0), (0, 0, 90))):
            Circle(CROQUIS10_R)
    extrude(amount=SALIENTE_EXTRUIR4_DEPTH)

    # Croquis10<3> → Saliente-Extruir5 (add)
    with BuildSketch(Plane(origin=(0, 5, 0), x_dir=(1, 0, 0), z_dir=(0, 1, 0))):
        with Locations(Location((0, -115, 0), (0, 0, 270))):
            Circle(CROQUIS10_3_R)
    extrude(amount=SALIENTE_EXTRUIR5_DEPTH)

    # Croquis11 → Cortar-Extruir1 (cut)
    with BuildSketch(Plane(origin=(0, 15, 0), x_dir=(1, 0, 0), z_dir=(0, 1, 0))):
        with Locations(Location((0, -115, 0), (0, 0, 270))):
            Circle(CROQUIS11_R)
    extrude(amount=-CORTAR_EXTRUIR1_DEPTH, mode=Mode.SUBTRACT)


solid = part.part
